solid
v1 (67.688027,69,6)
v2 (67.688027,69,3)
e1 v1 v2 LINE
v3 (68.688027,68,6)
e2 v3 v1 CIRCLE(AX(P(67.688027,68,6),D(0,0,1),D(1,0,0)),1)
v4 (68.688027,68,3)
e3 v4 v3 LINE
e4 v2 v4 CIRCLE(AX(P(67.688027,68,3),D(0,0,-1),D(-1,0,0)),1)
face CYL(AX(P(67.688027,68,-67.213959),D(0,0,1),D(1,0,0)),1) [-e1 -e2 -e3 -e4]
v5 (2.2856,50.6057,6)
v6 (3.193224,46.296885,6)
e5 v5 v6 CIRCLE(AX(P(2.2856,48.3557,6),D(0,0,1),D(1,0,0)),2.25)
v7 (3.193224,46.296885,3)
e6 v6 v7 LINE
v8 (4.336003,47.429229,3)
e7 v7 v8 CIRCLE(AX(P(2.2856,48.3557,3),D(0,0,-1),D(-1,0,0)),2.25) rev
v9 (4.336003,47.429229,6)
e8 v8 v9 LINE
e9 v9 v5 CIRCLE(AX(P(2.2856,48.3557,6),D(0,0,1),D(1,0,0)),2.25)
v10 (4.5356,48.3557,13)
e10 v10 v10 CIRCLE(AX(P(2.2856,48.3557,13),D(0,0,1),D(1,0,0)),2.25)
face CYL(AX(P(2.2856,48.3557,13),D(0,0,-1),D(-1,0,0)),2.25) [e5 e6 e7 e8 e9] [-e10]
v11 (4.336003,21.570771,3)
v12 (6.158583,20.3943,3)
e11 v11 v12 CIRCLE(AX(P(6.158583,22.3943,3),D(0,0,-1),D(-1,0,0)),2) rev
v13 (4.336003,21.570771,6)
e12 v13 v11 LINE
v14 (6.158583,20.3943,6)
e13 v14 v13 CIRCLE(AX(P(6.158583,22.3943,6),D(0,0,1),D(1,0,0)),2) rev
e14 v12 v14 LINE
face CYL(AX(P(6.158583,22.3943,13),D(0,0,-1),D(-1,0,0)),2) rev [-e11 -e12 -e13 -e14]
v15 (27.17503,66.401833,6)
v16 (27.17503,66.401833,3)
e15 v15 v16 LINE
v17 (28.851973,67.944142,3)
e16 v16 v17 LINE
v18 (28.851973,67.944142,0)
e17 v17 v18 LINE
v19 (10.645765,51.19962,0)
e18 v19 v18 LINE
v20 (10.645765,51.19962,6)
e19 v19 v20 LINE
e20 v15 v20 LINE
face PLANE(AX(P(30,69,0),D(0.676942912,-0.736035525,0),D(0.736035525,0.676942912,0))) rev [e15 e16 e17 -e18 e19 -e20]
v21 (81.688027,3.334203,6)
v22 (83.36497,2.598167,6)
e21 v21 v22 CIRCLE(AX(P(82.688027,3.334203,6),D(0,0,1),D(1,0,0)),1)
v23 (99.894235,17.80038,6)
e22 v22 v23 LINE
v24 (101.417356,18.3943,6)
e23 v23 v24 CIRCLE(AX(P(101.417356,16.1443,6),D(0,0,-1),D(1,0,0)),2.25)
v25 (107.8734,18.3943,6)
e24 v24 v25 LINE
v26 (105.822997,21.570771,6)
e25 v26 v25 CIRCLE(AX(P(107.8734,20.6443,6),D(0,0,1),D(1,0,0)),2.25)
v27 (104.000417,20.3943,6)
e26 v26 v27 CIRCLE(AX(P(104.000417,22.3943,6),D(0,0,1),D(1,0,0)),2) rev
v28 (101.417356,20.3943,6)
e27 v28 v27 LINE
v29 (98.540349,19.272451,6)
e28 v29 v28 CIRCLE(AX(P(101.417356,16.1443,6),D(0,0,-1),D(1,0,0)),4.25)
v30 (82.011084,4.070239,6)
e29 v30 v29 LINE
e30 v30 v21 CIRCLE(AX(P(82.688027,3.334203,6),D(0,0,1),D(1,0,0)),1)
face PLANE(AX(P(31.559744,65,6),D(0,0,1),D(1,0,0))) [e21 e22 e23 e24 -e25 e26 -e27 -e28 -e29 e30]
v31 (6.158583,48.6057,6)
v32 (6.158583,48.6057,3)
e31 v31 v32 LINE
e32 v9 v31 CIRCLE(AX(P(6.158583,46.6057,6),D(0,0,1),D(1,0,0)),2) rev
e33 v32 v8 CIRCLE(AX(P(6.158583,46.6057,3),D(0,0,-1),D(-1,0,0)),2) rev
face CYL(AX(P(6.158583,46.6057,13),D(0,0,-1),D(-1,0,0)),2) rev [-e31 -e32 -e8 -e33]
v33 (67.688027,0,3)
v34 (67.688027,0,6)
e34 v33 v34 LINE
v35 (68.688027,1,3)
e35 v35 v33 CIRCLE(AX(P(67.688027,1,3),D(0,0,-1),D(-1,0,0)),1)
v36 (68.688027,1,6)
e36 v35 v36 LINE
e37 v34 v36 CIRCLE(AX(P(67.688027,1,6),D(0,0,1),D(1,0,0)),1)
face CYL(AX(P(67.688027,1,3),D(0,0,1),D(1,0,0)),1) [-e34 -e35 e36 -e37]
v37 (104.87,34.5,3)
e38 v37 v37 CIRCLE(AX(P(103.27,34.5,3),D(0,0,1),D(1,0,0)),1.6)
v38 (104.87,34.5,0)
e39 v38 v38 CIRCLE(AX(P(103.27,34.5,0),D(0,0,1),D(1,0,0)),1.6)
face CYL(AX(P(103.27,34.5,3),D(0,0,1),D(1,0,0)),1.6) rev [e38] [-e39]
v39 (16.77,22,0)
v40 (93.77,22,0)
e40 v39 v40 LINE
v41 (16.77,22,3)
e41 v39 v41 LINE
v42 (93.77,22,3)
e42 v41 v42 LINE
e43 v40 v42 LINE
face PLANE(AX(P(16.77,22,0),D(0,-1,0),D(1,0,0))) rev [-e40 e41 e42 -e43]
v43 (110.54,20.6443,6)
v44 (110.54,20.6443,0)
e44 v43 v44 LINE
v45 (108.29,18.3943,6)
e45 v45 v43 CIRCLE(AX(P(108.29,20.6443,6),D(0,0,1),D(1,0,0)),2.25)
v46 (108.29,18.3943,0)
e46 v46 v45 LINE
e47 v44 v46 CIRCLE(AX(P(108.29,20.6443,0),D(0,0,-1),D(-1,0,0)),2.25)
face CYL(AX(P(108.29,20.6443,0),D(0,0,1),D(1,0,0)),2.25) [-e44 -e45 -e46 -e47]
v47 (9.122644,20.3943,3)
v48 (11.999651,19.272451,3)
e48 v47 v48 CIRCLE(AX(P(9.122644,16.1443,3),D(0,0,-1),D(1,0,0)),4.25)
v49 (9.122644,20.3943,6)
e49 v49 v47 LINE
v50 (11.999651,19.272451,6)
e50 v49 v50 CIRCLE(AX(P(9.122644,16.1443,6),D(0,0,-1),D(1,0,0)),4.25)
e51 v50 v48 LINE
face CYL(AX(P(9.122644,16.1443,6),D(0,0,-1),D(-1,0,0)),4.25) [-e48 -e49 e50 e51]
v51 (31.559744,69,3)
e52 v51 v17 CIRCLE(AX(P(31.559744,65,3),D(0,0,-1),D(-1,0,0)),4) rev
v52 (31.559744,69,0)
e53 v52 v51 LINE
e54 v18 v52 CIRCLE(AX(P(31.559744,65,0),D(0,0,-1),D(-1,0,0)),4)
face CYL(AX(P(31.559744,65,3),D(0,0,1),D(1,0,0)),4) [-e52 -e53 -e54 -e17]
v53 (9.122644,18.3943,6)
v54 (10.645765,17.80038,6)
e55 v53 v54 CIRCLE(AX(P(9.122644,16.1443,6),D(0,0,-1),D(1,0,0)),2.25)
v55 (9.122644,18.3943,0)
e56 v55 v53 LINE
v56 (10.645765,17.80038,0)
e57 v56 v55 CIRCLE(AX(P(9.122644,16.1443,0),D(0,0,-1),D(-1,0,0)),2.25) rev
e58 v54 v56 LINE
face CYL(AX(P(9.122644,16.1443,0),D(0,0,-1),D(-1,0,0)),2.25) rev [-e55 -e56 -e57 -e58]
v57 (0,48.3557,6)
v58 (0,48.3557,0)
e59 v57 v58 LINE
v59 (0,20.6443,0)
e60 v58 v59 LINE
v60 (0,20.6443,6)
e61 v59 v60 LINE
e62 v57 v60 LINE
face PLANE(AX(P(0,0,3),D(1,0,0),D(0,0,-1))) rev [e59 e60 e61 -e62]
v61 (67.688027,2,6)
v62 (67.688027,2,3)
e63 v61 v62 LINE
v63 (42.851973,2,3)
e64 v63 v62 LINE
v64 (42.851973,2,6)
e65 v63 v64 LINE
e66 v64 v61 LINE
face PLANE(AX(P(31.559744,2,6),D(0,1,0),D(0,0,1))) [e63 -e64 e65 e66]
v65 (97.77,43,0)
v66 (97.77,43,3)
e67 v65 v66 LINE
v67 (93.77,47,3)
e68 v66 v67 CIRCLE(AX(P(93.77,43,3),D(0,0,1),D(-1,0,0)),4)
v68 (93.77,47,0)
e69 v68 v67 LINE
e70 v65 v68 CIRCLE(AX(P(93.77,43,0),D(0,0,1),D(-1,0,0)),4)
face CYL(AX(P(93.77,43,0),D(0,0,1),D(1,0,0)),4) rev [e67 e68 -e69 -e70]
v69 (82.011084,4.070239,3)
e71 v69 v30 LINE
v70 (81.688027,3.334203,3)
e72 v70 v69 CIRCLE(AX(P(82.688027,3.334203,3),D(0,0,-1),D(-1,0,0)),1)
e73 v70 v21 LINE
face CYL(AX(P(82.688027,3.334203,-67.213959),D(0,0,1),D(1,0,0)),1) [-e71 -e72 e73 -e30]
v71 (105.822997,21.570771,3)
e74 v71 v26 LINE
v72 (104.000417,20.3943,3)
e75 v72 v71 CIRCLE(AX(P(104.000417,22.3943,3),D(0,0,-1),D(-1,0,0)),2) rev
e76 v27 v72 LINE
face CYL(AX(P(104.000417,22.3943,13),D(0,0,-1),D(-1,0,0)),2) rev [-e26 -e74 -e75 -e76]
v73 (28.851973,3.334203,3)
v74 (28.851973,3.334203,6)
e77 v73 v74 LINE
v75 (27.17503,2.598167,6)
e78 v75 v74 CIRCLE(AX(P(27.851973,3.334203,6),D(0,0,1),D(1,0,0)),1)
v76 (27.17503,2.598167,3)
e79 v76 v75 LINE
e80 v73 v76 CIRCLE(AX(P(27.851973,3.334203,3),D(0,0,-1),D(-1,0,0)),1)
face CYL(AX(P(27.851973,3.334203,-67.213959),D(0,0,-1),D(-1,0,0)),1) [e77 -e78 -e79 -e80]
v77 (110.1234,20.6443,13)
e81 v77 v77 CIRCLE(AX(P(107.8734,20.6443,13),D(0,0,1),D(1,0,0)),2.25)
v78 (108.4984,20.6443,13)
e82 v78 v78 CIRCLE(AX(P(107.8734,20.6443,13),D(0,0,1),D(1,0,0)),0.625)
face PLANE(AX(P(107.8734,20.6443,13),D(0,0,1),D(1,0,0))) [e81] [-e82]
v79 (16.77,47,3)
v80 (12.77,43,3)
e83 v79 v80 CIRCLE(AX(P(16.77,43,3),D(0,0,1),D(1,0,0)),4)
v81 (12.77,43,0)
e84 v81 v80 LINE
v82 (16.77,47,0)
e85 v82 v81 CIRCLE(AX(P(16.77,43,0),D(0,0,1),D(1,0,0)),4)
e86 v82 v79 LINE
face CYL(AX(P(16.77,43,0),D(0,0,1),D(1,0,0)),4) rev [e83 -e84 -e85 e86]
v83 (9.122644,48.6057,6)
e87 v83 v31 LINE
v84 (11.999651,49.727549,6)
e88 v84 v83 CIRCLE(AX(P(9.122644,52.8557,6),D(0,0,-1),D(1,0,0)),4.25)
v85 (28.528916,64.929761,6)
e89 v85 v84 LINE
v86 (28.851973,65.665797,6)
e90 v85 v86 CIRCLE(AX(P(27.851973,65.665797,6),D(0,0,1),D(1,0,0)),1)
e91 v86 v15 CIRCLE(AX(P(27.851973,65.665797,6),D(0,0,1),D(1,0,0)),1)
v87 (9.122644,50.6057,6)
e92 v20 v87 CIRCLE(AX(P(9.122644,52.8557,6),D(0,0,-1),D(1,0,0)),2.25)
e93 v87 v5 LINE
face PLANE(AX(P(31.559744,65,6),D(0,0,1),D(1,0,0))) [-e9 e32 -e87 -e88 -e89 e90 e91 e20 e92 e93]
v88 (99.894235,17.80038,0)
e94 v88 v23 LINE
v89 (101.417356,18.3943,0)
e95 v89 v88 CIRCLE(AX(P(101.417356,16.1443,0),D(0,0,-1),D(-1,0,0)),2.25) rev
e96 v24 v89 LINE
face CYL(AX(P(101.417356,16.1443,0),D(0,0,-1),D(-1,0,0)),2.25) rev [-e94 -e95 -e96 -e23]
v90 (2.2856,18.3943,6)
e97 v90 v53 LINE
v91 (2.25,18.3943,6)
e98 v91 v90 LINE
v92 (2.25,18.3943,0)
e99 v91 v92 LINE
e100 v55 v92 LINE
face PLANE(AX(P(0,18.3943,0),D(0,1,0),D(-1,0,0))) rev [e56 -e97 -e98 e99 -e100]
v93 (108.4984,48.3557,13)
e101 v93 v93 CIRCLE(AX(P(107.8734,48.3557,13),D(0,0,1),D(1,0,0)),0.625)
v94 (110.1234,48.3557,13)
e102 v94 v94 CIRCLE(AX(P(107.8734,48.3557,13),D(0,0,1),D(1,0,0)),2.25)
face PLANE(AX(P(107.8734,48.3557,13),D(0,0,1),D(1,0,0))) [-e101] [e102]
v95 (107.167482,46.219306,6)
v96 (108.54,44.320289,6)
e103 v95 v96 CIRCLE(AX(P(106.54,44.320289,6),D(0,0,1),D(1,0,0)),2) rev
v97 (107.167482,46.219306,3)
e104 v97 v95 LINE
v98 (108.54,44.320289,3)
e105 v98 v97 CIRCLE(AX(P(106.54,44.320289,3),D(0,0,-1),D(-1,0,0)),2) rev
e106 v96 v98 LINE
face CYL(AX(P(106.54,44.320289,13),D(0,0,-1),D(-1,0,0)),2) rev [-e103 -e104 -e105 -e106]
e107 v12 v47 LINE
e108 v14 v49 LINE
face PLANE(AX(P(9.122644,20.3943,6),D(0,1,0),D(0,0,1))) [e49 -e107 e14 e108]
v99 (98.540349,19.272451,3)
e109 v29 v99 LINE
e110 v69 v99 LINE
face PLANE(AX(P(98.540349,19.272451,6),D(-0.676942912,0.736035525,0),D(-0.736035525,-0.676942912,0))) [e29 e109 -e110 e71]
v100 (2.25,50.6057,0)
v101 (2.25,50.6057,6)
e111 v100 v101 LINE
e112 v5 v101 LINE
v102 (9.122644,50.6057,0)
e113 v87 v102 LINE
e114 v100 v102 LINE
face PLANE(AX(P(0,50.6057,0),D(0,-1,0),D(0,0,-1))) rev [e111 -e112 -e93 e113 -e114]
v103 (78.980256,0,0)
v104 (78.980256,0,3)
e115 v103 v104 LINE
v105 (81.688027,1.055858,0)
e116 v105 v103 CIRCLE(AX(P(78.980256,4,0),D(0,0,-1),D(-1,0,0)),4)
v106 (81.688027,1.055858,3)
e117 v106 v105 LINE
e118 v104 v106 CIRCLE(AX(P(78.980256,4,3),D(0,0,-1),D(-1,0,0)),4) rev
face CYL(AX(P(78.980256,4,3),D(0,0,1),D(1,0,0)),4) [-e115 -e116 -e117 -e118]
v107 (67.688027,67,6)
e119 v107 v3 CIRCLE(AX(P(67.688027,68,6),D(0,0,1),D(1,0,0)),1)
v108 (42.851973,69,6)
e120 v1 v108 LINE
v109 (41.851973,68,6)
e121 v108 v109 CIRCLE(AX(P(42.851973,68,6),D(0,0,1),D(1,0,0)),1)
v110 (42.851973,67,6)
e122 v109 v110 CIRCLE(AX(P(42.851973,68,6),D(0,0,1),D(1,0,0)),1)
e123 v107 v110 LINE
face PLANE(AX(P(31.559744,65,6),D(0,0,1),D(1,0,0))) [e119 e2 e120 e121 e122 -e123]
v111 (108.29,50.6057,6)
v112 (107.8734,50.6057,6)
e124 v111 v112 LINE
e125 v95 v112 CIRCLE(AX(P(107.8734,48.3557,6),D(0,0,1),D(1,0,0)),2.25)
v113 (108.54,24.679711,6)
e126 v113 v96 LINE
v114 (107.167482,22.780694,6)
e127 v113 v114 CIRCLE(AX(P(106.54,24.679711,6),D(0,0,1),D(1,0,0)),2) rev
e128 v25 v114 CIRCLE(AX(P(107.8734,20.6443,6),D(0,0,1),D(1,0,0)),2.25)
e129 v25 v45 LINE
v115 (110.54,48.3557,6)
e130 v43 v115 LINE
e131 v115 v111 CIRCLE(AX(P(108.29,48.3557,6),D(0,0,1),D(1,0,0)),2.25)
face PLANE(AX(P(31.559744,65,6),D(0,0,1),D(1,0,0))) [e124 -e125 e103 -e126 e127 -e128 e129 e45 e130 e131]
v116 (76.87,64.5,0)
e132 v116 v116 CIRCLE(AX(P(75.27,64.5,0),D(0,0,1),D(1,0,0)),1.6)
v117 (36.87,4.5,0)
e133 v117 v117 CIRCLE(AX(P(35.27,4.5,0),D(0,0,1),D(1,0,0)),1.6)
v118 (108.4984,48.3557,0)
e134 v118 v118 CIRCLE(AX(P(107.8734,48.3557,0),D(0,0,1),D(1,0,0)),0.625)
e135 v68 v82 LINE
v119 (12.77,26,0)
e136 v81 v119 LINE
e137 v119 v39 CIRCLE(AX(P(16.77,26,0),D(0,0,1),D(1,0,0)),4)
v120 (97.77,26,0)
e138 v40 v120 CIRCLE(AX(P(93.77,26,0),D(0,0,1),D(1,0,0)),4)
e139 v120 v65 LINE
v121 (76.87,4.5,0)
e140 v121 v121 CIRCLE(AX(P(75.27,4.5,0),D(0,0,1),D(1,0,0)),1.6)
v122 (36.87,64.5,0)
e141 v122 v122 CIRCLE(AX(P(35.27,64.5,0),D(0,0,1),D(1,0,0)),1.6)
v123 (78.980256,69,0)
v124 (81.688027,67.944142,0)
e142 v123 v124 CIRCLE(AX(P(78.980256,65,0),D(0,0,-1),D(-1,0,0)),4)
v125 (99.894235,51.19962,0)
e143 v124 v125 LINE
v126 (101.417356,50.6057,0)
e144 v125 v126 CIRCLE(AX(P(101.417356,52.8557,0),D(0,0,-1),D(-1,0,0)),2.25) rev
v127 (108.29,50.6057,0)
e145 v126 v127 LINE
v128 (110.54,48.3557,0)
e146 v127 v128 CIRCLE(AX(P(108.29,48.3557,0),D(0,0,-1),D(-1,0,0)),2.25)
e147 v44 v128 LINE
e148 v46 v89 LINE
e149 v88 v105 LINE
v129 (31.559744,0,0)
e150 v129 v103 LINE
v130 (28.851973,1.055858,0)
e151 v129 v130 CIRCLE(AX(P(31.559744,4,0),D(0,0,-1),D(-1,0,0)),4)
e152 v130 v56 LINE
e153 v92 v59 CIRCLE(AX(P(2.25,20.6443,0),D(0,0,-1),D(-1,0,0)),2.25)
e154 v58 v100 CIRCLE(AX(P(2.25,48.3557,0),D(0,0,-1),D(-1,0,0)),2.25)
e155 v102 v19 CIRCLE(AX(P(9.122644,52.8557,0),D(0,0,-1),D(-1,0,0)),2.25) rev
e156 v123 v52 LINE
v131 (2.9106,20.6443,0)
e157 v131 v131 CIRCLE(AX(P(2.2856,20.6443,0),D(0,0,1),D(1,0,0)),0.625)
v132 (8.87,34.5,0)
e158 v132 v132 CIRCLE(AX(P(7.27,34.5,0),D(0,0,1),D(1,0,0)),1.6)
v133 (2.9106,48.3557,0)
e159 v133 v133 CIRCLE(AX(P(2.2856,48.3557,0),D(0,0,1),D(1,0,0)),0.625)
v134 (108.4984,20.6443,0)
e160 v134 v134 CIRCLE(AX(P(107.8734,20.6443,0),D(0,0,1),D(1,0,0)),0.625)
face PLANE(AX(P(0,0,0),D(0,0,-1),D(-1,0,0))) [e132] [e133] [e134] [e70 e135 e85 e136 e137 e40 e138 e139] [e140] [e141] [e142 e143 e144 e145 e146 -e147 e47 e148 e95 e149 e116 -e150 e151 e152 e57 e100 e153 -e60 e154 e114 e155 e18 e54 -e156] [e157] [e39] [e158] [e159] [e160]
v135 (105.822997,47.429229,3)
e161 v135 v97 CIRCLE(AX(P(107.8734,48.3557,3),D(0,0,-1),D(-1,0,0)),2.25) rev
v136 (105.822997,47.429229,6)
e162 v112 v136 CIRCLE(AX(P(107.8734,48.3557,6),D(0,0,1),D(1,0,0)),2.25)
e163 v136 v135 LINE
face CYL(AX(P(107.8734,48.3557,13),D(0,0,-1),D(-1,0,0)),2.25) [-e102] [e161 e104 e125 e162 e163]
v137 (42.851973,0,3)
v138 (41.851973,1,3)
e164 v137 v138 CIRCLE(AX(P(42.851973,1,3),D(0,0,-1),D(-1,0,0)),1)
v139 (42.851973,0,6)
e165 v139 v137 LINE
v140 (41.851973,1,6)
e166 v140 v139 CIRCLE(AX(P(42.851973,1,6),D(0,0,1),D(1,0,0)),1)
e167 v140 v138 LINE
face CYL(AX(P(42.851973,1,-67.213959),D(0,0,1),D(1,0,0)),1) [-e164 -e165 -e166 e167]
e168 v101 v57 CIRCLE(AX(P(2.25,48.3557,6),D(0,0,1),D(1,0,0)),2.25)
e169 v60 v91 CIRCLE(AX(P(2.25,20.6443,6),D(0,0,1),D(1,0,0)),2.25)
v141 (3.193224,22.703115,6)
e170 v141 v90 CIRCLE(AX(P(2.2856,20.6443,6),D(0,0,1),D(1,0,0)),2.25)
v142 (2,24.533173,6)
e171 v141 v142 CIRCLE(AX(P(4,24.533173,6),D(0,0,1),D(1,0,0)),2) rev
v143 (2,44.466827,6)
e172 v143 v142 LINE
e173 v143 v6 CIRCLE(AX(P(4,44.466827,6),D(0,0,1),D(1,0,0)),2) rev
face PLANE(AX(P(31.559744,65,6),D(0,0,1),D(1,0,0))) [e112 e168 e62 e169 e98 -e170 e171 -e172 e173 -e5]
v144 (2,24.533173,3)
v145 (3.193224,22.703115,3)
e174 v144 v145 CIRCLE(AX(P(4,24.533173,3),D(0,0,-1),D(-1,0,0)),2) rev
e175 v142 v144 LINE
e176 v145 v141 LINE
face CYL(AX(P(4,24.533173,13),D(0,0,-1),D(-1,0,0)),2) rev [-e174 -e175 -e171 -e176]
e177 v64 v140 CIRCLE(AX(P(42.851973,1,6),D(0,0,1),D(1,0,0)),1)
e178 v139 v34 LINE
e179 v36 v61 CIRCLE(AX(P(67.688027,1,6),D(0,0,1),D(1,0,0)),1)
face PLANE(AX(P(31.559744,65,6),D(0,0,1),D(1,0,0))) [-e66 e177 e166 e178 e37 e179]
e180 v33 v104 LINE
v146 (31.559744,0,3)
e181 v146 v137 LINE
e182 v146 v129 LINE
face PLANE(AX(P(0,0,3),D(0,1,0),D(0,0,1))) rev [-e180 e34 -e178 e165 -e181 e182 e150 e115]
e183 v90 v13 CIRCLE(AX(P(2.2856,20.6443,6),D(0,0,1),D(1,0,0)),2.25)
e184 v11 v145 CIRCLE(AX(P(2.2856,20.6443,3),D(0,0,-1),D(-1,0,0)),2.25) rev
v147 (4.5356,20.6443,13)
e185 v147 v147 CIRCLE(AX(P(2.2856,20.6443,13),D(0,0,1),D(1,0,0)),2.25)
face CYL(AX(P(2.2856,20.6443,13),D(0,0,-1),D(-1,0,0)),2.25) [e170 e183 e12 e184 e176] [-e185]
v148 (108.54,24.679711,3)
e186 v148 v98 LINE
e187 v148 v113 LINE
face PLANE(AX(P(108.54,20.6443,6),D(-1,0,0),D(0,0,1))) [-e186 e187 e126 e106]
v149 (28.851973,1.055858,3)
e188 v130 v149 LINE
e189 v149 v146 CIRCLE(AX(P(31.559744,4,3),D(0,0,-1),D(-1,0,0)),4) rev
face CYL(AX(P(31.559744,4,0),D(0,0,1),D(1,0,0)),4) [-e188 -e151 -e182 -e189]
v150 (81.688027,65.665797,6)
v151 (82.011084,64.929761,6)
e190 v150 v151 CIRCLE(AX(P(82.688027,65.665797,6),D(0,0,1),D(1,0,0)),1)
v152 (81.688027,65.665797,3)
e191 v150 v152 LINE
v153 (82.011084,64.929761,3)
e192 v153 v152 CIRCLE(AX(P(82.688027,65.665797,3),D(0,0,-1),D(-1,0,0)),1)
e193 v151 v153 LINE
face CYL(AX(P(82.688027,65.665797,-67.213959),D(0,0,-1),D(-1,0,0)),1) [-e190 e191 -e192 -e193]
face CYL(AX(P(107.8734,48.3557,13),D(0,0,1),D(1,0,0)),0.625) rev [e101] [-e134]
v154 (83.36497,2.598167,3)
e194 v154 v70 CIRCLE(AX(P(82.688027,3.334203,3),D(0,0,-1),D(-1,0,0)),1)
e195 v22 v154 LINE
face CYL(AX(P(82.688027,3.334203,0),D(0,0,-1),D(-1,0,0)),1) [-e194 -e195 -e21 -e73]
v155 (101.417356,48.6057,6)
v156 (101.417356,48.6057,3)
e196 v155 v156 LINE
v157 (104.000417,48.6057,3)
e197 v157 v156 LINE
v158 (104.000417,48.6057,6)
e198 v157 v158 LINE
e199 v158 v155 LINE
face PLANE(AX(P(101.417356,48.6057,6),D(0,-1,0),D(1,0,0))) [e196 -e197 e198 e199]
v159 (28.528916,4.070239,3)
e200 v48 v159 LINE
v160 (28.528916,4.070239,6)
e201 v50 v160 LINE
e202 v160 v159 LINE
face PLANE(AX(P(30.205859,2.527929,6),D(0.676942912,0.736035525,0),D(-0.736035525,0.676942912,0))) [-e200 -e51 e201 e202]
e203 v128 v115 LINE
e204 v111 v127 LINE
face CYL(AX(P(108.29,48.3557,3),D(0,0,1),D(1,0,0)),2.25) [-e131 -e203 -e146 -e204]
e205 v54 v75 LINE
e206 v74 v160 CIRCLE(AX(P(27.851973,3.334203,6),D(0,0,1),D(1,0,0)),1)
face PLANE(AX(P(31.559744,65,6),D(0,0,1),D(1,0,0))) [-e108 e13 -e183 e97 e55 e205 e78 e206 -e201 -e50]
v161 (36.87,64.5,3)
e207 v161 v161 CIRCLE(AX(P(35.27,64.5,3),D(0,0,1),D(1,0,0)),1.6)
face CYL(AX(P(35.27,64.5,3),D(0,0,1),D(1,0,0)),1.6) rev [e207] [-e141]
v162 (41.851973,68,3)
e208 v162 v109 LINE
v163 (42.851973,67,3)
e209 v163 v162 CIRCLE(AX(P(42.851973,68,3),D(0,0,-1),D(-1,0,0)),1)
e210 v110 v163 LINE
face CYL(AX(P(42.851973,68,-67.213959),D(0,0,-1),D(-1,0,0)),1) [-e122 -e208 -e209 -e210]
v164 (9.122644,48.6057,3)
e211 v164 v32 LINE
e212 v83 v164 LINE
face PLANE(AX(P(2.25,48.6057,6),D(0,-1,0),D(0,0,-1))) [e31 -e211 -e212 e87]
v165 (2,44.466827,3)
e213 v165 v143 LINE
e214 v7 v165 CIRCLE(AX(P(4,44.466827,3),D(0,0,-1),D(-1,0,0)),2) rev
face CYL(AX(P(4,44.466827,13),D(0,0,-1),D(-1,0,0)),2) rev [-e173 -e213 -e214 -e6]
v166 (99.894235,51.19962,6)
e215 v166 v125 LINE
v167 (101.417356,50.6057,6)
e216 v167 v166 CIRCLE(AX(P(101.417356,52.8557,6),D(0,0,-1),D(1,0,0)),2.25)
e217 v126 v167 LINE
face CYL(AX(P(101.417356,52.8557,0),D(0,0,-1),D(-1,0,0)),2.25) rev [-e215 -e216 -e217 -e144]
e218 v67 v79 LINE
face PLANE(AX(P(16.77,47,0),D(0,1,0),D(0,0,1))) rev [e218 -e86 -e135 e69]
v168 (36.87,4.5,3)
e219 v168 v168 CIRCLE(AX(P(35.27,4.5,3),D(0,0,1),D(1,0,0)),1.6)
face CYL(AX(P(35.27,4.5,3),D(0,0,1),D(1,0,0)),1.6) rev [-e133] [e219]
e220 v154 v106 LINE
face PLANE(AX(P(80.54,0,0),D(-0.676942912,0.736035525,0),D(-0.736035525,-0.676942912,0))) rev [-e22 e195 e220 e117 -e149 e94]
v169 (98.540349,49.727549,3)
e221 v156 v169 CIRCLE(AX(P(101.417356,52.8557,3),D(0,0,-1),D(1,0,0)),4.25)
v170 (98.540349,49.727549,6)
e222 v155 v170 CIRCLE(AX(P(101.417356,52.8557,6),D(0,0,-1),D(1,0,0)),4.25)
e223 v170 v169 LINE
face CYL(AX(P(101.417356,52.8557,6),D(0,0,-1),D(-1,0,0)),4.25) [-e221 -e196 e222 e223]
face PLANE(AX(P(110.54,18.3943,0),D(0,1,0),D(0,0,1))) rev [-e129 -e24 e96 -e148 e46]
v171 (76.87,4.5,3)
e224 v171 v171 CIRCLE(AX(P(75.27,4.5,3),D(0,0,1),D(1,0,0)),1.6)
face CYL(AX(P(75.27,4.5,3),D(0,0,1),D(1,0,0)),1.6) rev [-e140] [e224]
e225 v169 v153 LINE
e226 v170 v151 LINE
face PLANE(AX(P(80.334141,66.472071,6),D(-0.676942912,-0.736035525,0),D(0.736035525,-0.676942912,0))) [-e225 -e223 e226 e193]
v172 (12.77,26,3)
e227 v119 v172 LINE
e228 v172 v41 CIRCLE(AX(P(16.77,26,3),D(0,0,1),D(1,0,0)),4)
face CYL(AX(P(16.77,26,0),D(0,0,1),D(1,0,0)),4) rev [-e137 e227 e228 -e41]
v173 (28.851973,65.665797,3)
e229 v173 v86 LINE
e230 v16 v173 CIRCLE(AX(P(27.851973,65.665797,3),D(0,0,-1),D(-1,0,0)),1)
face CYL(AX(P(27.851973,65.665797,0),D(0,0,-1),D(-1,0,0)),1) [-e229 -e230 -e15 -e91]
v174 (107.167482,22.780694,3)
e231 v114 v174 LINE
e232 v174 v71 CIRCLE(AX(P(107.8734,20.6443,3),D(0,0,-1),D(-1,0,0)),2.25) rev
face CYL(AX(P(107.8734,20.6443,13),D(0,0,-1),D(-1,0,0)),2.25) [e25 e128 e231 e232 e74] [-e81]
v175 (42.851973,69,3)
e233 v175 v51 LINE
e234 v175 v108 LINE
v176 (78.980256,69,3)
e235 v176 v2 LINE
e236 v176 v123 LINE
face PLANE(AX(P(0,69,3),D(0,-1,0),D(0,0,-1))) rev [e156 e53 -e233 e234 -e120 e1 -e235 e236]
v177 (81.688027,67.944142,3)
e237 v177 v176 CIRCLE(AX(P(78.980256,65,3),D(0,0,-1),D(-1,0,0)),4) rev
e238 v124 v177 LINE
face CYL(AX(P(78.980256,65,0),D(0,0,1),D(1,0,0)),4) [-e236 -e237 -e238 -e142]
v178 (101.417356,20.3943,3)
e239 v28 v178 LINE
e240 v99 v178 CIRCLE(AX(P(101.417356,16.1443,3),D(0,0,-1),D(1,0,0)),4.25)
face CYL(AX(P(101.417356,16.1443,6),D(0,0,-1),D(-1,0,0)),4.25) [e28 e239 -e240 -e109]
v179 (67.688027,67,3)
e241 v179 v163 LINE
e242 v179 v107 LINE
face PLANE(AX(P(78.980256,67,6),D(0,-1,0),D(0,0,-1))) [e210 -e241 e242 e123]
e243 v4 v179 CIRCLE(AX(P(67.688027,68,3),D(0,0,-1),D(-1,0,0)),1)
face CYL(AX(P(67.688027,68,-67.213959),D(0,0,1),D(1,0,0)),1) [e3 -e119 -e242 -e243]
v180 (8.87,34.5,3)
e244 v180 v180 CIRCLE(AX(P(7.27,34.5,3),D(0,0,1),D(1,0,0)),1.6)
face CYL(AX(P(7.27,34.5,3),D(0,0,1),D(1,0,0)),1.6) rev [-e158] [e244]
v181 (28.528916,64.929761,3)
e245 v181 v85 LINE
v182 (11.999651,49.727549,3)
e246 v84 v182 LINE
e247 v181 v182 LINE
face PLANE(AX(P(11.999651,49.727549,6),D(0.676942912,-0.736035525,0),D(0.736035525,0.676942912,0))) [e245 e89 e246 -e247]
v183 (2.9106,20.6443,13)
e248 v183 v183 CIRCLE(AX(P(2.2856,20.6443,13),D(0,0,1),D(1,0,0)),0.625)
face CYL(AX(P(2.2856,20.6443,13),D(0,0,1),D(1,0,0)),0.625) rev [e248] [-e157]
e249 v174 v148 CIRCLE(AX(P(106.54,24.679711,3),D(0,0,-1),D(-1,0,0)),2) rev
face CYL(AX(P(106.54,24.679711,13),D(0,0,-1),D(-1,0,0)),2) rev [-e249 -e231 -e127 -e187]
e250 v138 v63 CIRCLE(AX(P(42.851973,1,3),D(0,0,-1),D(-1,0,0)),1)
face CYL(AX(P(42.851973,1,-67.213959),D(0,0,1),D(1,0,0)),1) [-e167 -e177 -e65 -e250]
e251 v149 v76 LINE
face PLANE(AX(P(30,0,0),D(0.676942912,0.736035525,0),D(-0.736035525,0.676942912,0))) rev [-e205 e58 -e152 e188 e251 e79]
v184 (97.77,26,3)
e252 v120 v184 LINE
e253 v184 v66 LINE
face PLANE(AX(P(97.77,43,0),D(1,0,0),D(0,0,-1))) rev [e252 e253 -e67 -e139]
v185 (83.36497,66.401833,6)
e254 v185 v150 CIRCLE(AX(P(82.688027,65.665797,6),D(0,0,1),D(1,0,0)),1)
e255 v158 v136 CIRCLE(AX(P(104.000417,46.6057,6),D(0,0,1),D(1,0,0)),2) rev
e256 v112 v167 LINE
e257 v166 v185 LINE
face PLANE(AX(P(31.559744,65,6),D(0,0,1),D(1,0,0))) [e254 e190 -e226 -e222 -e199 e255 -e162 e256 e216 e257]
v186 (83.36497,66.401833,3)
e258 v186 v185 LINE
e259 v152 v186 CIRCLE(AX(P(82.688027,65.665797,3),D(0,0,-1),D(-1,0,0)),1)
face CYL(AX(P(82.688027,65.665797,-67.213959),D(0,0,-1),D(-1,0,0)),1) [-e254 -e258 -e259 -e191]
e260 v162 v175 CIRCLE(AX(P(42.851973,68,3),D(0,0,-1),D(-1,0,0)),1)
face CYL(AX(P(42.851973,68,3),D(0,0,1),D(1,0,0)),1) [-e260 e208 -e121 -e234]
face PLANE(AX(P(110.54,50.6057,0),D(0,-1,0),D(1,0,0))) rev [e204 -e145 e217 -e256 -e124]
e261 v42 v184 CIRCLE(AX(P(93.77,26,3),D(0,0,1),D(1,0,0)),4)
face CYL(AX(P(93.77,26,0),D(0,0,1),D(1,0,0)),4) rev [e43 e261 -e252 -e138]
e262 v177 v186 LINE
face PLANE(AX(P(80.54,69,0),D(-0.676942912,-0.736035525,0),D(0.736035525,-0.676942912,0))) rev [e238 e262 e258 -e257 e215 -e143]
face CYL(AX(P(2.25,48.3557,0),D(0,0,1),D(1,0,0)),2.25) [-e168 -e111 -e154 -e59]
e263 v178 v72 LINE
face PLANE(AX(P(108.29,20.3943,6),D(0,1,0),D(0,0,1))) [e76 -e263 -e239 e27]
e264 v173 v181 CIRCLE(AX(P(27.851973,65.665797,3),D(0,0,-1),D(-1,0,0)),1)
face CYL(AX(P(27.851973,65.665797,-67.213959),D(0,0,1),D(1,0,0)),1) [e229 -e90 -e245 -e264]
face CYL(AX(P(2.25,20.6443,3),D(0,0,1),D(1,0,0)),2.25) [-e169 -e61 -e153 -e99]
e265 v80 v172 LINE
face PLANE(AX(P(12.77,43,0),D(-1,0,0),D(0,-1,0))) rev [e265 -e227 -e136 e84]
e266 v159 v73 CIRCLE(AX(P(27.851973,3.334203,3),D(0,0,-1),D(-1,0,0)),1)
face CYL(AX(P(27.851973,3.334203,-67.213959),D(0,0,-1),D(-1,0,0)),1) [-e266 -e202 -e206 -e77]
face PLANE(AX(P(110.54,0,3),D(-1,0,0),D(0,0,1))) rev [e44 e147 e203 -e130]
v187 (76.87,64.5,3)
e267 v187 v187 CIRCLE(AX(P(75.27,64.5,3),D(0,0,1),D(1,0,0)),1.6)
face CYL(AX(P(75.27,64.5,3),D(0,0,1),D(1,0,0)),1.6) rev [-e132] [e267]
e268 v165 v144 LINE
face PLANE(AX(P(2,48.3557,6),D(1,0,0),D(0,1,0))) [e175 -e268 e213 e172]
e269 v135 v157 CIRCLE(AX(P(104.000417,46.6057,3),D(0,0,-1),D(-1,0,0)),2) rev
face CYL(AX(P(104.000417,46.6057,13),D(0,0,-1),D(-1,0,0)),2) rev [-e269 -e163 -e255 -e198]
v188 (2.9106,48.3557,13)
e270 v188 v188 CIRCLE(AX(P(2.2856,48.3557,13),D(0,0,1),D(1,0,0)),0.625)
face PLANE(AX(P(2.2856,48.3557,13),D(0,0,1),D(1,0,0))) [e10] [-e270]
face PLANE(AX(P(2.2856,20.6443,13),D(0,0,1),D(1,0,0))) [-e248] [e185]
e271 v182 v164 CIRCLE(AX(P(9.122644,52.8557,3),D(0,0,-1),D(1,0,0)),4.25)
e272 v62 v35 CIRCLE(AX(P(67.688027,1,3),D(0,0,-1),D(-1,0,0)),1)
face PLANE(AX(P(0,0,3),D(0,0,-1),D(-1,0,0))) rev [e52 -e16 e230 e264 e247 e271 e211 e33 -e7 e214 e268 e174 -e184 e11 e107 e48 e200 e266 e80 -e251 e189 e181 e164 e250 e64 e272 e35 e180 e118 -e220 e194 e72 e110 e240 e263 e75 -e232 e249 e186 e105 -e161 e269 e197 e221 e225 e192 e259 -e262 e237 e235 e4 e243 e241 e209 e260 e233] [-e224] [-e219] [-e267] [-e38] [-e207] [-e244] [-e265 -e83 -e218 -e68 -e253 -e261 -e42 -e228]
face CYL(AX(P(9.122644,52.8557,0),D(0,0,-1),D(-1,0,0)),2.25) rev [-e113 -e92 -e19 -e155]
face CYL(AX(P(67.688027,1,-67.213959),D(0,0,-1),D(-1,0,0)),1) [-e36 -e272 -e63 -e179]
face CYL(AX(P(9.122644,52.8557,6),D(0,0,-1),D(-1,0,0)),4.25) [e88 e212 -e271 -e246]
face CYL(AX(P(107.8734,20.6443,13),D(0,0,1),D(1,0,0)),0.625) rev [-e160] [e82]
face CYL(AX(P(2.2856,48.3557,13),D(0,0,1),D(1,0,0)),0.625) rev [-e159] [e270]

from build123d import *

# Parameters (mm, degrees)
SKETCH1_W                  = 110.54
SKETCH1_H                  = 69
BOSS_EXTRUDE1_DEPTH        = 3
F_3_2_3_2_DIAMETER_HOLE1_D = 3.2
SKETCH5_R                  = 2.25
BOSS_EXTRUDE2_DEPTH        = 10
CUT_EXTRUDE2_DEPTH         = 131.690824468
CUT_EXTRUDE1_DEPTH         = 131.690824468
FILLET1_R                  = 2.25
FILLET3_R                  = 4
BOSS_EXTRUDE3_DEPTH        = 3
M1_6_TAPPED_HOLE1_D        = 1.25
FILLET2_R                  = 2
SKETCH10_W                 = 13
SKETCH10_H                 = 69
CUT_EXTRUDE3_DEPTH         = 3
FILLET4_R                  = 1


# Some blends are built 0.0001 mm under size
with BuildPart() as part:
    # Sketch1 → Boss-Extrude1 (new body)
    with BuildSketch(Plane.XY):
        with Locations((55.27, 34.5)):
            Rectangle(SKETCH1_W, SKETCH1_H)
    extrude(amount=BOSS_EXTRUDE1_DEPTH)

    # Ø3.2 (3.2) Diameter Hole1 (through all)
    with Locations(Plane.XY.offset(3)):
        with Locations((35.27, 64.5), (75.27, 64.5), (103.27, 34.5), (75.27, 4.5), (35.27, 4.5), (7.27, 34.5)):
            Hole(F_3_2_3_2_DIAMETER_HOLE1_D / 2)

    # Sketch5 → Boss-Extrude2 (add)
    with BuildSketch(Plane.XY.offset(3)):
        with Locations(Location((2.2856, 48.3557, 0), (0, 0, 180))):
            Circle(SKETCH5_R)
        with Locations(Location((2.2856, 20.6443, 0), (0, 0, 180))):
            Circle(SKETCH5_R)
        with Locations(Location((107.8734, 48.3557, 0), (0, 0, 180))):
            Circle(SKETCH5_R)
        with Locations(Location((107.8734, 20.6443, 0), (0, 0, 180))):
            Circle(SKETCH5_R)
    extrude(amount=BOSS_EXTRUDE2_DEPTH)

    # Sketch6 → Cut-Extrude2 (cut, through all)
    with BuildSketch(Plane.XY.offset(3)):
        with BuildLine():
            Line((16.77, 47), (93.77, 47))
            ThreePointArc((93.77, 47), (96.598427125, 45.828427125), (97.77, 43))
            Line((97.77, 43), (97.77, 26))
            ThreePointArc((97.77, 26), (96.598427125, 23.171572875), (93.77, 22))
            Line((93.77, 22), (16.77, 22))
            ThreePointArc((16.77, 22), (13.941572875, 23.171572875), (12.77, 26))
            Line((12.77, 26), (12.77, 43))
            ThreePointArc((12.77, 43), (13.941572875, 45.828427125), (16.77, 47))
        make_face()
    extrude(amount=-CUT_EXTRUDE2_DEPTH, mode=Mode.SUBTRACT)

    # Sketch2 → Cut-Extrude1 (cut, through all)
    with BuildSketch(Plane.XY.offset(3)):
        Polygon((0, 69), (30, 69), (10, 50.6057), (0, 50.6057), align=None)
        Polygon((110.54, 69), (80.54, 69), (100.54, 50.6057), (110.54, 50.6057), align=None)
        Polygon((0, 0), (30, 0), (10, 18.3943), (0, 18.3943), align=None)
        Polygon((110.54, 0), (80.54, 0), (100.54, 18.3943), (110.54, 18.3943), align=None)
    extrude(amount=-CUT_EXTRUDE1_DEPTH, mode=Mode.SUBTRACT)

    # Fillet1
    fillet1_edges = [part.edges().sort_by_distance(p)[0] for p in [
        (110.54, 50.6057, 1.5),
        (100.54, 50.6057, 1.5),
        (0, 18.3943, 1.5),
        (10, 18.3943, 1.5),
        (110.54, 18.3943, 1.5),
        (100.54, 18.3943, 1.5),
        (0, 50.6057, 1.5),
        (10, 50.6057, 1.5),
    ]]
    fillet(fillet1_edges, radius=FILLET1_R)

    # Fillet3
    fillet3_edges = [part.edges().sort_by_distance(p)[0] for p in [
        (80.54, 69, 1.5),
        (30, 0, 1.5),
        (80.54, 0, 1.5),
        (30, 69, 1.5),
    ]]
    fillet(fillet3_edges, radius=FILLET3_R)

    # Sketch9 → Boss-Extrude3 (add)
    with BuildSketch(Plane.XY.offset(3)):
        with BuildLine():
            Line((10.64576534, 51.19962007), (28.851972729, 67.944142098))
            ThreePointArc((28.851972729, 67.944142098), (30.106569989, 68.726698834), (31.559744378, 69))
            Line((31.559744378, 69), (78.980255622, 69))
            ThreePointArc((78.980255622, 69), (80.433430011, 68.726698834), (81.688027271, 67.944142098))
            Line((81.688027271, 67.944142098), (99.89423466, 51.19962007))
            ThreePointArc((99.89423466, 51.19962007), (100.599945619, 50.759431906), (101.417356213, 50.6057))
            Line((101.417356213, 50.6057), (107.8734, 50.6057))
            Line((107.8734, 50.6057), (108.29, 50.6057))
            ThreePointArc((108.29, 50.6057), (109.880990258, 49.946690258), (110.54, 48.3557))
            Line((110.54, 48.3557), (110.54, 20.6443))
            ThreePointArc((110.54, 20.6443), (109.880990258, 19.053309742), (108.29, 18.3943))
            Line((108.29, 18.3943), (107.8734, 18.3943))
            Line((107.8734, 18.3943), (101.417356213, 18.3943))
            ThreePointArc((101.417356213, 18.3943), (100.599945619, 18.240568094), (99.89423466, 17.80037993))
            Line((99.89423466, 17.80037993), (81.688027271, 1.055857902))
            ThreePointArc((81.688027271, 1.055857902), (80.433430011, 0.273301166), (78.980255622, 0))
            Line((78.980255622, 0), (31.559744378, 0))
            ThreePointArc((31.559744378, 0), (30.106569989, 0.273301166), (28.851972729, 1.055857902))
            Line((28.851972729, 1.055857902), (10.64576534, 17.80037993))
            ThreePointArc((10.64576534, 17.80037993), (9.940054381, 18.240568094), (9.122643787, 18.3943))
            Line((9.122643787, 18.3943), (2.2856, 18.3943))
            Line((2.2856, 18.3943), (2.25, 18.3943))
            ThreePointArc((2.25, 18.3943), (0.659009742, 19.053309742), (0, 20.6443))
            Line((0, 20.6443), (0, 48.3557))
            ThreePointArc((0, 48.3557), (0.659009742, 49.946690258), (2.25, 50.6057))
            Line((2.25, 50.6057), (2.2856, 50.6057))
            Line((2.2856, 50.6057), (9.122643787, 50.6057))
            ThreePointArc((9.122643787, 50.6057), (9.940054381, 50.759431906), (10.64576534, 51.19962007))
        make_face()
        with BuildLine():
            Line((11.999651165, 49.727549021), (30.205858553, 66.472071049))
            ThreePointArc((30.205858553, 66.472071049), (30.833157184, 66.863349417), (31.559744378, 67))
            Line((31.559744378, 67), (78.980255622, 67))
            ThreePointArc((78.980255622, 67), (79.706842816, 66.863349417), (80.334141447, 66.472071049))
            Line((80.334141447, 66.472071049), (98.540348835, 49.727549021))
            ThreePointArc((98.540348835, 49.727549021), (99.873358425, 48.896082489), (101.417356213, 48.6057))
            Line((101.417356213, 48.6057), (107.8734, 48.6057))
            Line((107.8734, 48.6057), (108.29, 48.6057))
            ThreePointArc((108.29, 48.6057), (108.466776695, 48.532476695), (108.54, 48.3557))
            Line((108.54, 48.3557), (108.54, 20.6443))
            ThreePointArc((108.54, 20.6443), (108.466776695, 20.467523305), (108.29, 20.3943))
            Line((108.29, 20.3943), (107.8734, 20.3943))
            Line((107.8734, 20.3943), (101.417356213, 20.3943))
            ThreePointArc((101.417356213, 20.3943), (99.873358425, 20.103917511), (98.540348835, 19.272450979))
            Line((98.540348835, 19.272450979), (80.334141447, 2.527928951))
            ThreePointArc((80.334141447, 2.527928951), (79.706842816, 2.136650583), (78.980255622, 2))
            Line((78.980255622, 2), (31.559744378, 2))
            ThreePointArc((31.559744378, 2), (30.833157184, 2.136650583), (30.205858553, 2.527928951))
            Line((30.205858553, 2.527928951), (11.999651165, 19.272450979))
            ThreePointArc((11.999651165, 19.272450979), (10.666641575, 20.103917511), (9.122643787, 20.3943))
            Line((9.122643787, 20.3943), (2.2856, 20.3943))
            Line((2.2856, 20.3943), (2.25, 20.3943))
            ThreePointArc((2.25, 20.3943), (2.073223305, 20.467523305), (2, 20.6443))
            Line((2, 20.6443), (2, 48.3557))
            ThreePointArc((2, 48.3557), (2.073223305, 48.532476695), (2.25, 48.6057))
            Line((2.25, 48.6057), (2.2856, 48.6057))
            Line((2.2856, 48.6057), (9.122643787, 48.6057))
            ThreePointArc((9.122643787, 48.6057), (10.666641575, 48.896082489), (11.999651165, 49.727549021))
        make_face(mode=Mode.SUBTRACT)
    extrude(amount=BOSS_EXTRUDE3_DEPTH)

    # M1.6 Tapped Hole1 (through all)
    with Locations(Plane.XY.offset(13)):
        with Locations((2.2856, 48.3557), (2.2856, 20.6443), (107.8734, 48.3557), (107.8734, 20.6443)):
            Hole(M1_6_TAPPED_HOLE1_D / 2)

    # Fillet2
    # the kernel refuses this fillet: 2 mm, written as the material it adds along each edge
    with BuildSketch(Plane(origin=(4.521667977, 20.3943, 6), x_dir=(1, 0, 0), z_dir=(0, 0, -1))) as fillet2_piece_1:
        with BuildLine():
            CenterArc((1.636915369, -2), FILLET2_R, 90, 65.684260829)
            ThreePointArc((-0.18566503, -1.176470588), (-0.013574106, -0.600743482), (0, 0))
            Line((0, 0), (1.636915369, 0))
        make_face()
    extrude(amount=3)
    with BuildSketch(Plane(origin=(2, 22.876100314, 6), x_dir=(0.9896542066602442, -0.14347317254344985, 0), z_dir=(0, 0, -1))) as fillet2_piece_2:
        with BuildLine():
            CenterArc((1.741562948, -1.926875227), FILLET2_R, 105.541291059, 66.209834964)
            Line((-0.237745465, -1.639928882), (0, 0))
            ThreePointArc((0, 0), (0.602848713, -0.082265369), (1.205697426, 0))
        make_face()
    extrude(amount=3)
    with BuildSketch(Plane(origin=(105.637332023, 48.6057, 6), x_dir=(0.15588599188398633, -0.9877750541162424, 0), z_dir=(0, 0, -1))) as fillet2_piece_3:
        with BuildLine():
            CenterArc((1.720377932, 1.928676151), FILLET2_R, 188.968184481, 65.684260829)
            Line((-0.255172176, 1.616904167), (0, 0))
            ThreePointArc((0, 0), (0.595515438, 0.08023933), (1.191030876, 0))
        make_face()
    extrude(amount=3)
    with BuildSketch(Plane(origin=(108.54, 46.20671316, 6), x_dir=(-0.9999579138949993, 0.00917444487481441, 0), z_dir=(0, 0, -1))) as fillet2_piece_4:
        with BuildLine():
            CenterArc((1.98260893, -1.904693967), FILLET2_R, 107.759172143, 71.715163512)
            Line((-0.017306897, -1.886345077), (0, 0))
            ThreePointArc((0, 0), (0.686287707, -0.107219287), (1.372575413, 0))
        make_face()
    extrude(amount=3)
    with BuildSketch(Plane(origin=(105.637332023, 20.3943, 6), x_dir=(0.15588599188398633, 0.9877750541162424, 0), z_dir=(0, 0, -1)), Plane(origin=(4.521667977, 48.6057, 6), x_dir=(-0.1558859918839805, -0.9877750541162433, 0), z_dir=(0, 0, -1))) as fillet2_piece_5:
        with BuildLine():
            CenterArc((1.720377932, -1.928676151), FILLET2_R, 105.34755469, 65.684260829)
            Line((-0.255172176, -1.616904167), (0, 0))
            ThreePointArc((0, 0), (0.595515438, -0.08023933), (1.191030876, 0))
        make_face()
    extrude(amount=3)
    with BuildSketch(Plane(origin=(108.54, 22.79328684, 6), x_dir=(-0.9999579138949993, -0.00917444487481441, 0), z_dir=(0, 0, -1))) as fillet2_piece_6:
        with BuildLine():
            CenterArc((1.98260893, 1.904693967), FILLET2_R, 180.525664345, 71.715163512)
            Line((-0.017306897, 1.886345077), (0, 0))
            ThreePointArc((0, 0), (0.686287707, 0.107219287), (1.372575413, 0))
        make_face()
    extrude(amount=3)
    with BuildSketch(Plane(origin=(2, 46.123899686, 6), x_dir=(0, -1, 0), z_dir=(0, 0, -1))) as fillet2_piece_7:
        with BuildLine():
            CenterArc((1.657072613, -2), FILLET2_R, 90, 66.209834964)
            ThreePointArc((-0.172985235, -1.193223529), (-0.005078349, -0.608414638), (0, 0))
            Line((0, 0), (1.657072613, 0))
        make_face()
    extrude(amount=3)

    # Sketch10 → Cut-Extrude3 (cut)
    with BuildSketch(Plane.XY.offset(6)):
        with Locations((35.351972729, 34.5)):
            Rectangle(SKETCH10_W, SKETCH10_H)
        with Locations((75.188027271, 34.5)):
            Rectangle(SKETCH10_W, SKETCH10_H)
    extrude(amount=-CUT_EXTRUDE3_DEPTH, mode=Mode.SUBTRACT)

    # Fillet4
    fillet4_edges = [part.edges().sort_by_distance(p)[0] for p in [
        (81.688027271, 3.773118052, 4.5),
        (41.851972729, 0, 4.5),
        (41.851972729, 2, 4.5),
        (68.688027271, 0, 4.5),
        (68.688027271, 2, 4.5),
        (81.688027271, 1.055857902, 4.5),
        (28.851972729, 1.055857902, 4.5),
        (28.851972729, 3.773118052, 4.5),
        (28.851972729, 65.226881948, 4.5),
        (28.851972729, 67.944142098, 4.5),
        (81.688027271, 65.226881948, 4.5),
        (81.688027271, 67.944142098, 4.5),
        (68.688027271, 67, 4.5),
        (68.688027271, 69, 4.5),
        (41.851972729, 69, 4.5),
        (41.851972729, 67, 4.5),
    ]]
    fillet(fillet4_edges, radius=FILLET4_R - 0.0001)  # a hair under: the kernel refuses the full size


solid = part.part
